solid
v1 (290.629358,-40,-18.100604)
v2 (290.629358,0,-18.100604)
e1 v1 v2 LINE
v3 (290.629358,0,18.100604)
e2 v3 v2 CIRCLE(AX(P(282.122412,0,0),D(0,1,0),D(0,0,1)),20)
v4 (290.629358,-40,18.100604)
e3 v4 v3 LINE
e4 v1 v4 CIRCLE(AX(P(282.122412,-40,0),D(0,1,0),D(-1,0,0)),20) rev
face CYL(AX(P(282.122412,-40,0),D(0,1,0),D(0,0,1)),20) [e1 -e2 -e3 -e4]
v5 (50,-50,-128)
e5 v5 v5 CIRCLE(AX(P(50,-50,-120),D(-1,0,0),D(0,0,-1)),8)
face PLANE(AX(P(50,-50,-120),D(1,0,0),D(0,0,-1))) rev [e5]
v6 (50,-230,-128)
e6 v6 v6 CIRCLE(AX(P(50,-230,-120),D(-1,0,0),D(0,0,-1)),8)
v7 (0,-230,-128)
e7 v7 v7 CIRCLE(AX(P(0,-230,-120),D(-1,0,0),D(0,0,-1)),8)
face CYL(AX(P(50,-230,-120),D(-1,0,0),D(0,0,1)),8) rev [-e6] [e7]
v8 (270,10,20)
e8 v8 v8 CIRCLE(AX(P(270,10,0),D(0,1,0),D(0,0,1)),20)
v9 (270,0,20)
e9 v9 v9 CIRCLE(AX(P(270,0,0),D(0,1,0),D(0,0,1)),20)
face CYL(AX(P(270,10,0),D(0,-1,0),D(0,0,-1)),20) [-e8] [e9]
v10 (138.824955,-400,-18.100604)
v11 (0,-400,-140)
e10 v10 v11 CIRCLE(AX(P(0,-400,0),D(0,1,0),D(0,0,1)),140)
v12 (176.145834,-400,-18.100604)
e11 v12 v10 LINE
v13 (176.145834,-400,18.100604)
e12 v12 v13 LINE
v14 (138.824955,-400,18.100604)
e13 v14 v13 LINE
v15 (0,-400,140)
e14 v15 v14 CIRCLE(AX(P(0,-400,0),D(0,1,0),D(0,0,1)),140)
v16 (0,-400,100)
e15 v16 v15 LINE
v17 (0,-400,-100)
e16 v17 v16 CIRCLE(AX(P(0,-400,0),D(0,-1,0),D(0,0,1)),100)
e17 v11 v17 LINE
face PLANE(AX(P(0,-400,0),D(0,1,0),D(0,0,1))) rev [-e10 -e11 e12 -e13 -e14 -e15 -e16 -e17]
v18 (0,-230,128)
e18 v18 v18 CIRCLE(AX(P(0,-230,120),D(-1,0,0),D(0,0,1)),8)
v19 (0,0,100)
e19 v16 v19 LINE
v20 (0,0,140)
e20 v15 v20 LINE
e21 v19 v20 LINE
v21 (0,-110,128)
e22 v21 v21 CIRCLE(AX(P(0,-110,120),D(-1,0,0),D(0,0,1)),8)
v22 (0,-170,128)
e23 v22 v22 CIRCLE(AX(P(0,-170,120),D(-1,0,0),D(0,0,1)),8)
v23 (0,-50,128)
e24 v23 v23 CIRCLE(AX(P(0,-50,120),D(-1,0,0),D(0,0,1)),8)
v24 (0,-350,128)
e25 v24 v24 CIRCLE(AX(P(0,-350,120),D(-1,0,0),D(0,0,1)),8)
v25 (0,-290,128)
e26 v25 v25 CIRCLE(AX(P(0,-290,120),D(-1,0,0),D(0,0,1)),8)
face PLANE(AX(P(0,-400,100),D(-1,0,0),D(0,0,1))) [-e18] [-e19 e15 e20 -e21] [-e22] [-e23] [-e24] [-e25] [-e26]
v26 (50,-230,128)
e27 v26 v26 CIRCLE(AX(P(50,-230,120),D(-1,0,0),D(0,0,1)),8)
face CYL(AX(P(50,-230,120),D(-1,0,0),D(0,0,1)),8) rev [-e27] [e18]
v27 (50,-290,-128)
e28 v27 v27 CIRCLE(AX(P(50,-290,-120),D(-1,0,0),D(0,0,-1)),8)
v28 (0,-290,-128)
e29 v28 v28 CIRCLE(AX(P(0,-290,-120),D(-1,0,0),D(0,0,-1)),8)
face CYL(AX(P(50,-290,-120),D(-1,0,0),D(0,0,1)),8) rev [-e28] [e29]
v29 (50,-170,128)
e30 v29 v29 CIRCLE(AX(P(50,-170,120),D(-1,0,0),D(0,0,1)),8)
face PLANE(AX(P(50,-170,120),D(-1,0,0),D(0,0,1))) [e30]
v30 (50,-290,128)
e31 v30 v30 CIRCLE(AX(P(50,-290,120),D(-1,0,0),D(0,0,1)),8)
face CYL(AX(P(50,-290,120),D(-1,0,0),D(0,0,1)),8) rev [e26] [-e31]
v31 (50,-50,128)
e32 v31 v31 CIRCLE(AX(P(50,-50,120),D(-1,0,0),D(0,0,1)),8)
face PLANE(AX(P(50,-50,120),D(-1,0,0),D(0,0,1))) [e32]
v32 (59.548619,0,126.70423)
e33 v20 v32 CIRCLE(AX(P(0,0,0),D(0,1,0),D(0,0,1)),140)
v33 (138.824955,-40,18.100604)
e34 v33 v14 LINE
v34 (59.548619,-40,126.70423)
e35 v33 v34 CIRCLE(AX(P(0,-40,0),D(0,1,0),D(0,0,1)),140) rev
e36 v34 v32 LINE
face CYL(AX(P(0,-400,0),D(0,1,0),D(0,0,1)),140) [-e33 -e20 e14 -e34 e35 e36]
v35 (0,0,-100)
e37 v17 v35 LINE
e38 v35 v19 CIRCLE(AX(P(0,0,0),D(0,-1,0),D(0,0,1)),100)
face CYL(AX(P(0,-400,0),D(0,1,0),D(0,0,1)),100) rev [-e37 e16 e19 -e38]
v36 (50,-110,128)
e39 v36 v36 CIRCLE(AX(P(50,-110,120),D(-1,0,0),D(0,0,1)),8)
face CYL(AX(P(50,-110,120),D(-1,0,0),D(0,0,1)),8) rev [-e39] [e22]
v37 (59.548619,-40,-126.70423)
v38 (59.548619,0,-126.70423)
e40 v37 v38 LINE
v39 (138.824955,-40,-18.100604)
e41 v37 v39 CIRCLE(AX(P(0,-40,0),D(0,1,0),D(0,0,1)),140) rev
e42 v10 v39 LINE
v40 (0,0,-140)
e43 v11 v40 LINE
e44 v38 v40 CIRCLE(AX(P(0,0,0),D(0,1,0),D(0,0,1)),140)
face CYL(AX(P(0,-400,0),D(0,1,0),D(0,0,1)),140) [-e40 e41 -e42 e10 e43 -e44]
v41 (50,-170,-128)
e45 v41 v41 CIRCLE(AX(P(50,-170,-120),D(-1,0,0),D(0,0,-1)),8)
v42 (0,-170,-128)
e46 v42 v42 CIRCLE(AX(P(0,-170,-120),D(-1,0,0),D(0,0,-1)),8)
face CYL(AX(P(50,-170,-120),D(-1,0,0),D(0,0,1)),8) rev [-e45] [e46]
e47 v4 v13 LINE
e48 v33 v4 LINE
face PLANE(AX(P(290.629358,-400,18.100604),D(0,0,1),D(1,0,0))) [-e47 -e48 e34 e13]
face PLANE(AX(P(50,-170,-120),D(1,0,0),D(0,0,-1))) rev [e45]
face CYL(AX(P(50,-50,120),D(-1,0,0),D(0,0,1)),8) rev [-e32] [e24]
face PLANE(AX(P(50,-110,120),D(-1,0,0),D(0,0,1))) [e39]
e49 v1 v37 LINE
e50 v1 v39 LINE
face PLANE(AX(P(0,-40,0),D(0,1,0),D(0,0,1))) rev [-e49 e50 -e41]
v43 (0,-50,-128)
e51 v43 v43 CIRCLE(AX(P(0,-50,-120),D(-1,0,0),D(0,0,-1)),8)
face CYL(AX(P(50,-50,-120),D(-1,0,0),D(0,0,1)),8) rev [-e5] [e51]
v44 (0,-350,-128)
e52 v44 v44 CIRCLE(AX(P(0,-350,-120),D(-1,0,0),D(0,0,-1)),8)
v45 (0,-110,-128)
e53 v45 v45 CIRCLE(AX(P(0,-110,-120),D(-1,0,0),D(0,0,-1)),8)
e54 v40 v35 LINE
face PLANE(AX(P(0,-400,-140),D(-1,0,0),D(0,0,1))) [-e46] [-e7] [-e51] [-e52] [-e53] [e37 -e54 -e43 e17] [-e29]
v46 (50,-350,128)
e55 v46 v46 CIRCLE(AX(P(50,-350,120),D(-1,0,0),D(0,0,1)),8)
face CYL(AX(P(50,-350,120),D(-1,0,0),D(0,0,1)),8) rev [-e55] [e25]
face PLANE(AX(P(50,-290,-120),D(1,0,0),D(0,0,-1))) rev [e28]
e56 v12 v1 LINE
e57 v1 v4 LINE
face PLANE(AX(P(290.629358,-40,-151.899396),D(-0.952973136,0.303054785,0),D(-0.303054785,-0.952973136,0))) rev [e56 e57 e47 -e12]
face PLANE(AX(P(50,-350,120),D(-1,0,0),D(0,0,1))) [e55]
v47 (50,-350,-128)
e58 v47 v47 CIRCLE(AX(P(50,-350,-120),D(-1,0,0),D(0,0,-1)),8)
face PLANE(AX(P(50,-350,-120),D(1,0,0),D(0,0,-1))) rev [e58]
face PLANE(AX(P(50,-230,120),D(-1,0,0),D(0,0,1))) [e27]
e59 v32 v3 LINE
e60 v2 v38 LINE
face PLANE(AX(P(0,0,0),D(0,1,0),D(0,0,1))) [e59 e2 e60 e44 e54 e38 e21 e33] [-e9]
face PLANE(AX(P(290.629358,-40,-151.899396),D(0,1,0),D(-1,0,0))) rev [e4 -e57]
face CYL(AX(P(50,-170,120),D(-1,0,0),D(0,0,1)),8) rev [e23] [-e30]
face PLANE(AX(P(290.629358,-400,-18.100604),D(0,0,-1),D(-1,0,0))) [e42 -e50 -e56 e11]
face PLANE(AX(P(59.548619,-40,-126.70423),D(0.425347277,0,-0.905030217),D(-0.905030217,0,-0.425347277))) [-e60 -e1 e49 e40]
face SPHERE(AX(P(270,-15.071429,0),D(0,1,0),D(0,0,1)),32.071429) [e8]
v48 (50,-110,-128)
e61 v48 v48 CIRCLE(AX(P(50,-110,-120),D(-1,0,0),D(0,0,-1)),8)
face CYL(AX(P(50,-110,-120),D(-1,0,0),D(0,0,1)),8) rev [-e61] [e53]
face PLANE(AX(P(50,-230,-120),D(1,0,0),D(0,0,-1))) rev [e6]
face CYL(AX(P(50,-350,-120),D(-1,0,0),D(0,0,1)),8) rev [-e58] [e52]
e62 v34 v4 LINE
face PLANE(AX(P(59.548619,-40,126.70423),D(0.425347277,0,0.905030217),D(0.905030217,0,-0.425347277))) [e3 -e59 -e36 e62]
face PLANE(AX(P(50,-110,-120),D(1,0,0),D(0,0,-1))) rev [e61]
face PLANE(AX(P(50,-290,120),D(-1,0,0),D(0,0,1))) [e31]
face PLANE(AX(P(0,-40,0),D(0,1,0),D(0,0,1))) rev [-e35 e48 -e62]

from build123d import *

# Parameters (mm, degrees)
Y_KSEKLIK_EKSTR_ZYON1_DEPTH = 400
Y_KSEKLIK_EKSTR_ZYON3_DEPTH = 40
Y_KSEKLIK_EKSTR_ZYON4_DEPTH = 360
IZIM16_R                    = 20
Y_KSEKLIK_EKSTR_ZYON5_DEPTH = 10
IZIM17_R                    = 8
KES_EKSTR_ZYON21_DEPTH      = 50
IZIM19_W                    = 11.493054453
IZIM19_H                    = 360
KES_EKSTR_ZYON23_DEPTH      = 170
KES_EKSTR_ZYON24_DEPTH      = 170


# Read off the part's stored shape, not the designer's step: Kubbe1
with BuildPart() as part:
    # Çizim1 → Yükseklik-Ekstrüzyon1 (new body)
    with BuildSketch(Plane(origin=(0, 0, 0), x_dir=(1, 0, 0), z_dir=(0, 1, 0))):
        with BuildLine():
            Line((0, 140), (0, 100))
            ThreePointArc((0, 100), (100, 0), (0, -100))
            Line((0, -100), (0, -140))
            ThreePointArc((0, -140), (140, 0), (0, 140))
        make_face()
    extrude(amount=-Y_KSEKLIK_EKSTR_ZYON1_DEPTH)

    # Çizim2 → Yükseklik-Ekstrüzyon3 (add)
    with BuildSketch(Plane(origin=(0, 0, 0), x_dir=(1, 0, 0), z_dir=(0, 1, 0))):
        with BuildLine():
            Line((59.548618827, 126.704230378), (290.629357971, 18.10060434))
            ThreePointArc((290.629357971, 18.10060434), (302.122412424, 0), (290.629357971, -18.10060434))
            Line((290.629357971, -18.10060434), (59.548618827, -126.704230378))
            ThreePointArc((59.548618827, -126.704230378), (30.507439642, -136.635632712), (0, -140))
            Line((0, -140), (0, -100))
            ThreePointArc((0, -100), (100, 0), (0, 100))
            Line((0, 100), (0, 140))
            ThreePointArc((0, 140), (30.507439642, 136.635632712), (59.548618827, 126.704230378))
        make_face()
    extrude(amount=-Y_KSEKLIK_EKSTR_ZYON3_DEPTH)

    # Çizim5 → Yükseklik-Ekstrüzyon4 (add)
    with BuildSketch(Plane(origin=(0, -40, 0), x_dir=(1, 0, 0), z_dir=(0, 1, 0))):
        with BuildLine():
            Line((290.629357971, 18.10060434), (98.34819837, 18.10060434))
            ThreePointArc((98.34819837, 18.10060434), (100, 0), (98.34819837, -18.10060434))
            Line((98.34819837, -18.10060434), (290.629357971, -18.10060434))
            ThreePointArc((290.629357971, -18.10060434), (302.122412424, 0), (290.629357971, 18.10060434))
        make_face()
    extrude(amount=-Y_KSEKLIK_EKSTR_ZYON4_DEPTH)

    # Çizim16 → Yükseklik-Ekstrüzyon5 (add)
    with BuildSketch(Plane(origin=(0, 0, 0), x_dir=(1, 0, 0), z_dir=(0, 1, 0))):
        with Locations(Location((270, 0, 0), (0, 0, 270))):
            Circle(IZIM16_R)
    extrude(amount=Y_KSEKLIK_EKSTR_ZYON5_DEPTH)

    # Kubbe1 outline → Kubbe1 (revolve)
    with BuildSketch(Plane(origin=(270, 0, 0), x_dir=(1, 0, 0), z_dir=(0, 0, 1))):
        with BuildLine():
            Line((0, 10), (20.000000025, 9.99999998))
            ThreePointArc((20.000000025, 9.99999998), (10.594810065, 15.199457281), (0, 17))
            Line((0, 17), (0, 10))
        make_face()
    revolve(axis=Axis((270, 0, 0), (0, 1, 0)))

    # Çizim17 → Kes-Ekstrüzyon21 (cut)
    with BuildSketch(Plane.ZY):
        with Locations((120, -50)):
            Circle(IZIM17_R)
        with Locations((120, -110)):
            Circle(IZIM17_R)
        with Locations((120, -170)):
            Circle(IZIM17_R)
        with Locations((120, -230)):
            Circle(IZIM17_R)
        with Locations((120, -290)):
            Circle(IZIM17_R)
        with Locations((120, -350)):
            Circle(IZIM17_R)
        with Locations(Location((-120, -350, 0), (0, 0, 180))):
            Circle(IZIM17_R)
        with Locations(Location((-120, -290, 0), (0, 0, 180))):
            Circle(IZIM17_R)
        with Locations(Location((-120, -230, 0), (0, 0, 180))):
            Circle(IZIM17_R)
        with Locations(Location((-120, -170, 0), (0, 0, 180))):
            Circle(IZIM17_R)
        with Locations(Location((-120, -110, 0), (0, 0, 180))):
            Circle(IZIM17_R)
        with Locations(Location((-120, -50, 0), (0, 0, 180))):
            Circle(IZIM17_R)
    extrude(amount=-KES_EKSTR_ZYON21_DEPTH, mode=Mode.SUBTRACT)

    # Çizim19 → Kes-Ekstrüzyon23 (cut)
    with BuildSketch(Plane.XY.offset(18.10060434)):
        with Locations((296.375885197, -220)):
            Rectangle(IZIM19_W, IZIM19_H)
    extrude(amount=-KES_EKSTR_ZYON23_DEPTH, mode=Mode.SUBTRACT)

    # Çizim21 → Kes-Ekstrüzyon24 (cut)
    with BuildSketch(Plane.XY.offset(18.10060434)):
        Polygon((290.629357971, -40), (176.145834142, -400), (290.629357971, -400), align=None)
    extrude(amount=-KES_EKSTR_ZYON24_DEPTH, mode=Mode.SUBTRACT)


solid = part.part
